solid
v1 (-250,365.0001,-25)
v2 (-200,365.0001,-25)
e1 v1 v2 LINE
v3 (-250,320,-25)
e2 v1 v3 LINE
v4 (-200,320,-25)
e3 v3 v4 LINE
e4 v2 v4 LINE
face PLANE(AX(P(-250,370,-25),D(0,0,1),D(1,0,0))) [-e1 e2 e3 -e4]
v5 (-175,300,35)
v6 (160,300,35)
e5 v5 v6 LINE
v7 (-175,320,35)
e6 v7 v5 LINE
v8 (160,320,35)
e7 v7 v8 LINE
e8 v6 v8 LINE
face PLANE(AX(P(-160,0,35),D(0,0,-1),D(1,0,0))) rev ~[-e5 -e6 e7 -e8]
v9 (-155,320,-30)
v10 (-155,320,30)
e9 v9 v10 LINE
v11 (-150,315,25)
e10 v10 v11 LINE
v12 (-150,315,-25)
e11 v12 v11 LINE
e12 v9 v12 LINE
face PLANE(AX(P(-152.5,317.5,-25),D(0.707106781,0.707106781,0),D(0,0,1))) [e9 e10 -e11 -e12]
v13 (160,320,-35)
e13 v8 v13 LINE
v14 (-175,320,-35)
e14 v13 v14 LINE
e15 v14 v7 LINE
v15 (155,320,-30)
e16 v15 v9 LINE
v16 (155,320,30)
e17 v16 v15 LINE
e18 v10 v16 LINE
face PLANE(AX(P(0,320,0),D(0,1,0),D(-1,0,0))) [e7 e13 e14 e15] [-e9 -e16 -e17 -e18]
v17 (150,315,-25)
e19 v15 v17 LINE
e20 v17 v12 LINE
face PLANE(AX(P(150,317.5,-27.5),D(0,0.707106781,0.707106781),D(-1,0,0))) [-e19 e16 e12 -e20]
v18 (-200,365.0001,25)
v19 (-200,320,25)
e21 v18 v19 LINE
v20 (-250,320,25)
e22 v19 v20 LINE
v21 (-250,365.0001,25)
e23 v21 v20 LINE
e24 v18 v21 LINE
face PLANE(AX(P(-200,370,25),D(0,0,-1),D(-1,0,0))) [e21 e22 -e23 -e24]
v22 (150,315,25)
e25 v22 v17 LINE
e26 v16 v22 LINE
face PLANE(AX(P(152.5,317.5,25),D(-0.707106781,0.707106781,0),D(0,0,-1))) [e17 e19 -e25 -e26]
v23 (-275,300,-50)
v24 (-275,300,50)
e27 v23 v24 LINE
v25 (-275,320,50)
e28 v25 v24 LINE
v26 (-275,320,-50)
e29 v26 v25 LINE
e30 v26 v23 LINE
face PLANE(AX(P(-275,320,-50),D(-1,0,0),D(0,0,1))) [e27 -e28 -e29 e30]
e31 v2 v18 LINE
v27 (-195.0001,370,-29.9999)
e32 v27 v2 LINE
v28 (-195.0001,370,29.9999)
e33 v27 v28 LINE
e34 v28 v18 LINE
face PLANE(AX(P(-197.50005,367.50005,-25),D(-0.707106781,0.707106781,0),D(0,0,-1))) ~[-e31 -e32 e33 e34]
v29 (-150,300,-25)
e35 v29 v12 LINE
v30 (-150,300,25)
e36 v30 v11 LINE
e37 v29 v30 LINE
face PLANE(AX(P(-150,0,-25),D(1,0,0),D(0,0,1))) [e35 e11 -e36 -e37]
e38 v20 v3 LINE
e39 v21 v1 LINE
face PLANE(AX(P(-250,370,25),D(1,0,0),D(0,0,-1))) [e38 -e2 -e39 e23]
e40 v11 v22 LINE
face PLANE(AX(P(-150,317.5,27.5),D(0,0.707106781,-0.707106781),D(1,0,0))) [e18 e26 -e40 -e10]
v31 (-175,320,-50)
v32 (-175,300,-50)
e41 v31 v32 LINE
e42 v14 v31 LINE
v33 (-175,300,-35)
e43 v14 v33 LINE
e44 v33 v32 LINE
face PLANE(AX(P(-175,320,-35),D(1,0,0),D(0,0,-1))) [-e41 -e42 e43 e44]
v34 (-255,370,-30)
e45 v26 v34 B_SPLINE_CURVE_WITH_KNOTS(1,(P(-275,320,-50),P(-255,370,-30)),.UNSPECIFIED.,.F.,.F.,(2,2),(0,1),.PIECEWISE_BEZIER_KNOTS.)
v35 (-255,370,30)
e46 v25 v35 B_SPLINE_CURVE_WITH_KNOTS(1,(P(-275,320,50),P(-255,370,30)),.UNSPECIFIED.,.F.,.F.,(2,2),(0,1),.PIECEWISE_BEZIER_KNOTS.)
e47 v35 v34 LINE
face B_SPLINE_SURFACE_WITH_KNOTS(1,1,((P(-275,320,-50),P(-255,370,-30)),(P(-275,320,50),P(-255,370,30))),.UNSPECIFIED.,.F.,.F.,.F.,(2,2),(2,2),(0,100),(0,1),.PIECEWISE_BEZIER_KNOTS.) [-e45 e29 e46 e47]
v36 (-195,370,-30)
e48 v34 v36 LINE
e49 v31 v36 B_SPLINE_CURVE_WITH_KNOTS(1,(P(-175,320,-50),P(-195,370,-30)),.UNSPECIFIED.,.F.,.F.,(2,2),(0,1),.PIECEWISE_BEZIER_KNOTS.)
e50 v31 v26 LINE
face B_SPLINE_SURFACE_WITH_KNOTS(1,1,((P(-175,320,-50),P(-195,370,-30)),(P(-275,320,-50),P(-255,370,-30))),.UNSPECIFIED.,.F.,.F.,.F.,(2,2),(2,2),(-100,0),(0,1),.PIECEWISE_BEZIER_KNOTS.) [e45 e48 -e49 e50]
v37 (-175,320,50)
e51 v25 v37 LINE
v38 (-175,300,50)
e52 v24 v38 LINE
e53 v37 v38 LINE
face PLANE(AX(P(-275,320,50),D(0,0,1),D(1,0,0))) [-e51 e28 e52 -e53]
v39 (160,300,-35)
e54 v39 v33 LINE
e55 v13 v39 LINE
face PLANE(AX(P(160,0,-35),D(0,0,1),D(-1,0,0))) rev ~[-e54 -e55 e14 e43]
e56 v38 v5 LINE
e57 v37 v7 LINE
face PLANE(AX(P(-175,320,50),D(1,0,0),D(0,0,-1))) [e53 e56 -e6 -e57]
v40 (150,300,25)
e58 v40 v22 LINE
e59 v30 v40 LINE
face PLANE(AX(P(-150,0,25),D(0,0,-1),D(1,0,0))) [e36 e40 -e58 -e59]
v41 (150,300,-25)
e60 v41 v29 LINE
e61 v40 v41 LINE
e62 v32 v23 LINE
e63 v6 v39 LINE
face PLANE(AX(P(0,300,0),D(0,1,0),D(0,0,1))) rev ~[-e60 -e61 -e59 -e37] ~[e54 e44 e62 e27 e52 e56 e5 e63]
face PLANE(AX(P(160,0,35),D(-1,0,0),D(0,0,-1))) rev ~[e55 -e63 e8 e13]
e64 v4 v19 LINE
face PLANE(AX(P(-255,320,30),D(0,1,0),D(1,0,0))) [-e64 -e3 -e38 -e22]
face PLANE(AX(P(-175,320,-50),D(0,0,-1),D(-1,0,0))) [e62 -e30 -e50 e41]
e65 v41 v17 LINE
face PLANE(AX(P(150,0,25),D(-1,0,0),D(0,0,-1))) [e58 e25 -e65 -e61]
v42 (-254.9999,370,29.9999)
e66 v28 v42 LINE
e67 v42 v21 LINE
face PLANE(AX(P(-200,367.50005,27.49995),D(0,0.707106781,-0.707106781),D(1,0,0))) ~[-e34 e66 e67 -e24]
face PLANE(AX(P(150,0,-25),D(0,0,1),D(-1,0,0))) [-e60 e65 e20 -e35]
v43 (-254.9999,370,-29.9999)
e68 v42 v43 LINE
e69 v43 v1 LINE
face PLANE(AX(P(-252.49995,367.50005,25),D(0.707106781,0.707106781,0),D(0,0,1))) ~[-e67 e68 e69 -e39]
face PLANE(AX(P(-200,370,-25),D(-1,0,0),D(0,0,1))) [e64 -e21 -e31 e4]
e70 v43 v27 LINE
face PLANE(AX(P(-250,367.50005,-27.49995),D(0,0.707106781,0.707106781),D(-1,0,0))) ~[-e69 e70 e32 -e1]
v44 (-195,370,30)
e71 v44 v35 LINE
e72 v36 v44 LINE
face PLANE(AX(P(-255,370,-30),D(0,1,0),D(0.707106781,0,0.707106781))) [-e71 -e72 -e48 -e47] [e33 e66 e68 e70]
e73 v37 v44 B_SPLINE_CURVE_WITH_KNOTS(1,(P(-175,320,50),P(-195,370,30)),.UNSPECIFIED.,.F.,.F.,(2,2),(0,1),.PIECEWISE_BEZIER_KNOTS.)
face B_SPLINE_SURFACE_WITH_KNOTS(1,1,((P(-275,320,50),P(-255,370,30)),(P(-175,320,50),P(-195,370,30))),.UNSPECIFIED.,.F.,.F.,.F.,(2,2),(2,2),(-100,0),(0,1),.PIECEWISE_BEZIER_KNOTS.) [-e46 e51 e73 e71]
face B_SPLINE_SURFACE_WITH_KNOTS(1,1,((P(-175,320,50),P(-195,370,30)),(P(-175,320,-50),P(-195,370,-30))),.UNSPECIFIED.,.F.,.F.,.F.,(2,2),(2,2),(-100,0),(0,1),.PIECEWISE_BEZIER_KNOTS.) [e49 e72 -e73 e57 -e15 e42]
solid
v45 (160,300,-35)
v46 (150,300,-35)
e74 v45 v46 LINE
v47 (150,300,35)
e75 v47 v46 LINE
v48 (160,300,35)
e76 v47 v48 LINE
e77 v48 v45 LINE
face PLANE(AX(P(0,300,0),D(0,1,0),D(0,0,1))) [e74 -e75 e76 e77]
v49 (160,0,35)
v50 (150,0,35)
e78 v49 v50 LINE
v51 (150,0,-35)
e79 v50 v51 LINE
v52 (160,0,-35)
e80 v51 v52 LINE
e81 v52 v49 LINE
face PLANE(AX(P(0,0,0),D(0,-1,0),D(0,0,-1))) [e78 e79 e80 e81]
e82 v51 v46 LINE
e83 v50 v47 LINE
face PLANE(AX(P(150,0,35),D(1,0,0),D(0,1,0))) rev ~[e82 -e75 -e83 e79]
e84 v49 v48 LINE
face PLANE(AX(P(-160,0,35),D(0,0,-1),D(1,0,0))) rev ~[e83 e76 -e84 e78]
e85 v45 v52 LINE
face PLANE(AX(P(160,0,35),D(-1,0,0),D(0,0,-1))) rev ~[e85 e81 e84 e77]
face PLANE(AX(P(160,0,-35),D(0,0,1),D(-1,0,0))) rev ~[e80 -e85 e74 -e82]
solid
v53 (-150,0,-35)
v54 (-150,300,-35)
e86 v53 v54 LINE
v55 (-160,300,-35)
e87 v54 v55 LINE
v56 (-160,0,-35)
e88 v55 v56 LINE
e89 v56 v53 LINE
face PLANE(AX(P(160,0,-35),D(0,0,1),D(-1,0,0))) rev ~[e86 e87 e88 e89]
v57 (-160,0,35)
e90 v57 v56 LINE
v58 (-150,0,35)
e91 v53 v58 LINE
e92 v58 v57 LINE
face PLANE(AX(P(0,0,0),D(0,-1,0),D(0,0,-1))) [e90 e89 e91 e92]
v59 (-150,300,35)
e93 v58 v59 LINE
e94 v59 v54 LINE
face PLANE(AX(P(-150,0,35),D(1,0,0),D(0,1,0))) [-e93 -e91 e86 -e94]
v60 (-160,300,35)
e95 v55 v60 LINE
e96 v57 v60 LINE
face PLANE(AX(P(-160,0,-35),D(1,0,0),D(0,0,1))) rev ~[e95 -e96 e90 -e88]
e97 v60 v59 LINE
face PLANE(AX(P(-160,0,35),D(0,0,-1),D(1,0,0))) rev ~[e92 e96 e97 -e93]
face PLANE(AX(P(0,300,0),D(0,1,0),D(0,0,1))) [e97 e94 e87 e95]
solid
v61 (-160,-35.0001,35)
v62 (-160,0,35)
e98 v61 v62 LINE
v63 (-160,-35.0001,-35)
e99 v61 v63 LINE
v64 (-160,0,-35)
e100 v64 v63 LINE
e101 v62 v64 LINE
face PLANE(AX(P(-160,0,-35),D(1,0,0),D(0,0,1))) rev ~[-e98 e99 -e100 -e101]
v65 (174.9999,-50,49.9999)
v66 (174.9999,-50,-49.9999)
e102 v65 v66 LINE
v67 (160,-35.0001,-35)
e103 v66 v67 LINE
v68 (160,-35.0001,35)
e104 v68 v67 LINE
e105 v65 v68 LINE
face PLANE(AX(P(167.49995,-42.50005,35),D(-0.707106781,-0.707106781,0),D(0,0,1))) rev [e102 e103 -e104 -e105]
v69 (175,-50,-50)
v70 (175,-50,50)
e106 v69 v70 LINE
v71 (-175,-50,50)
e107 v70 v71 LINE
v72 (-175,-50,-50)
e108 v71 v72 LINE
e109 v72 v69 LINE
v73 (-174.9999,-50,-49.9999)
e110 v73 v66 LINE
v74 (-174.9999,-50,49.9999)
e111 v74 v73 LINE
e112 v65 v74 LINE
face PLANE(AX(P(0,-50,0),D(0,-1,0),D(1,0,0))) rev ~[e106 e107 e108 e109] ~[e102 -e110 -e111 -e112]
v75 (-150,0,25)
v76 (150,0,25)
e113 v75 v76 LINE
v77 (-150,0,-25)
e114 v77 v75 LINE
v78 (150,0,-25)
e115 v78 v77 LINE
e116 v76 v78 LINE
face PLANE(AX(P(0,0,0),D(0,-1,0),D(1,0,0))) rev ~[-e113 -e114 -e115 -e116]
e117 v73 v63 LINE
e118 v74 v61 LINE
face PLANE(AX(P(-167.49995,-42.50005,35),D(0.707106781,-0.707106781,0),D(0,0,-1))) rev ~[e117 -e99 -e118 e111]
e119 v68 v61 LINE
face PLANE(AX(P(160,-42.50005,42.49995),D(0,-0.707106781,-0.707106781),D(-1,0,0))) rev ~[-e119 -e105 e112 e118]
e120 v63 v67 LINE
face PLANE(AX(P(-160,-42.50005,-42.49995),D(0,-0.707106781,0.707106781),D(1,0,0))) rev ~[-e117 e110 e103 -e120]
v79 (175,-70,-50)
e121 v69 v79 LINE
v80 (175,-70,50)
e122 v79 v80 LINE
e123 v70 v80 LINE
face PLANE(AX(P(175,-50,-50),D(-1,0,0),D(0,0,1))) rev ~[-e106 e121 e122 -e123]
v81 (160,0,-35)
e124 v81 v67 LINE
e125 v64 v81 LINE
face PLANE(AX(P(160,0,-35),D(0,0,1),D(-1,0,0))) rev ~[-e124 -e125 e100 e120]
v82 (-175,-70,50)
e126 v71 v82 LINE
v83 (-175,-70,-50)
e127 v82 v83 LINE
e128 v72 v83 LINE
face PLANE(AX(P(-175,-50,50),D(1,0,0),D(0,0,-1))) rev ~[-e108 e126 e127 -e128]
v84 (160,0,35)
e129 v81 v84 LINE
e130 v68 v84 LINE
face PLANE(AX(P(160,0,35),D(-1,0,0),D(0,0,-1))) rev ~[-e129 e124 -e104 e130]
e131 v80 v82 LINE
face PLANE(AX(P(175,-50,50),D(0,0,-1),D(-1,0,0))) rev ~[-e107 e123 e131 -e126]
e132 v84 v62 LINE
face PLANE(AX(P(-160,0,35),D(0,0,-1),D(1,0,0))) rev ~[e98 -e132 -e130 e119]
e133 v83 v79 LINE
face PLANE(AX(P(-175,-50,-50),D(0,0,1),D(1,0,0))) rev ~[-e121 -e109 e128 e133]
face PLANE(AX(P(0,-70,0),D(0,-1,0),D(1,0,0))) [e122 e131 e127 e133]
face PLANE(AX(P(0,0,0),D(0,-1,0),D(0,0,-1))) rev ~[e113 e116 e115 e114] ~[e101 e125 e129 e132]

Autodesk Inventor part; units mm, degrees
sketch "Sketch1" plane through (0, 0, 0) normal (0, 1, 0) x (-1, 0, 0)
  line L0 (150, 25) -> (-150, 25)
  line L1 (-150, 25) -> (-150, -25)
  line L2 (-150, -25) -> (150, -25)
  line L3 (150, -25) -> (150, 25)
  line L4 (150, 25) -> (-150, -25) construction
  line L5 (-150, 25) -> (150, -25) construction
  line L6 (160, 35) -> (-160, 35)
  line L7 (-160, 35) -> (-160, -35)
  line L8 (-160, -35) -> (160, -35)
  line L9 (160, -35) -> (160, 35)
  line L10 (160, 35) -> (-160, -35) construction
  line L11 (-160, 35) -> (160, -35) construction
  point P0 (0, 0)
  dimension "d0" = 300
  dimension "d1" = 50
  dimension "d2" = 320
  dimension "d3" = 70
extrude "Extrusion1" add sketch "Sketch1" along normal blind 320
ref_plane "Work Plane1" through (0, 300, 0) normal (0, 1, 0) x (1, 0, 0)
sketch "Sketch2" plane through (0, 0, 0) normal (0, -1, 0) x (1, 0, 0)
  line L0 (160, 35) -> (160, -35) projected
  line L1 (-160, -35) -> (160, -35)
  line L2 (160, -35) -> (160, 35)
  line L3 (160, 35) -> (-160, 35)
  line L4 (-160, 35) -> (-160, -35)
  line L5 (-160, -35) -> (160, 35) construction
  line L6 (160, -35) -> (-160, 35) construction
  point P0 (0, 0)
extrude "Extrusion2" add sketch "Sketch2" along normal blind 50
sketch "Sketch3" plane through (0, -50, 0) normal (0, -1, 0) x (1, 0, 0)
  line L0 (-175, -50) -> (175, -50)
  line L1 (175, -50) -> (175, 50)
  line L2 (175, 50) -> (-175, 50)
  line L3 (-175, 50) -> (-175, -50)
  line L4 (-175, -50) -> (175, 50) construction
  line L5 (175, -50) -> (-175, 50) construction
  point P0 (0, 0)
  dimension "d9" = 350
  dimension "d10" = 100
extrude "Extrusion3" add sketch "Sketch3" along normal blind 20
chamfer "Chamfer1" distance 15 angle 45 4 edges at (0, -50, 35) (-160, -50, 0) (0, -50, -35) (160, -50, 0)
chamfer "Chamfer2" distance 5 angle 45 4 edges at (0, 320, -25) (-150, 320, 0) (0, 320, 25) (150, 320, 0)
split body "Split1" result two bodies by plane through (0, 300, 0) normal (0, 1, 0) first body at (50, 300.5, 31.6667)
ref_plane "Work Plane2" through (0, 0, 0) normal (0, -1, 0) x (1, 0, 0)
split body "Split2" result two bodies by plane through (0, 0, 0) normal (0, -1, 0) bodies 3 first body at (58.3333, -69.5, -16.6667)
sketch "Sketch4" plane through (-160, 300, 35) normal (0, 0, 1) x (1, 0, 0)
  line L0 (10, -300) -> (10, 0) projected
  line L1 (310, -300) -> (310, 0) projected
  line L2 (10, 0) -> (310, 0)
  line L3 (310, 0) -> (310, -300)
  line L4 (310, -300) -> (10, -300)
  line L5 (10, -300) -> (10, 0)
  point P0 (160, -300)
extrude "Extrusion4" cut sketch "Sketch4" against normal through all bodies 5
sketch "Sketch5" plane through (0, 320, 0) normal (0, 1, 0) x (1, 0, 0)
  line L0 (-175, -50) -> (-175, 50) projected
  line L1 (-175, 50) -> (-275, 50)
  line L2 (-275, 50) -> (-275, -50)
  line L3 (-275, -50) -> (-175, -50)
  line L4 (-175, -50) -> (-175, 50)
  line L5 (-160, 35) -> (160, 35) projected
  line L6 (-160, 35) -> (-175, 35)
  line L7 (-175, 35) -> (-175, -35)
  line L8 (-175, -35) -> (-160, -35)
  line L9 (-160, -35) -> (-160, 35)
  point P0 (0, 0)
  dimension "d22" = 100
  dimension "d23" = 100
  dimension "d24" = 15
  dimension "d25" = 70
extrude "Extrusion5" add sketch "Sketch5" against normal blind 20 bodies 2
ref_plane "Work Plane3" through (0, 370, 0) normal (0, 1, 0) x (1, 0, 0)
sketch "Sketch7" plane through (0, 370, 0) normal (0, 1, 0) x (1, 0, 0)
  line L0 (-255, 30) -> (-195, 30)
  line L1 (-195, 30) -> (-195, -30)
  line L2 (-195, -30) -> (-255, -30)
  line L3 (-255, -30) -> (-255, 30)
  line L4 (-175, 50) -> (-275, 50) projected
  line L5 (-275, 50) -> (-275, -50) projected
  point P0 (0, 0)
  dimension "d33" = 60
  dimension "d34" = 60
  dimension "d35" = 20
  dimension "d36" = 20
sketch "Sketch8" plane through (0, 320, 0) normal (0, 1, 0) x (1, 0, 0)
  line L0 (-275, 50) -> (-275, -50) projected
  line L1 (-175, -50) -> (-275, -50) projected
  line L2 (-275, 50) -> (-175, 50)
  line L3 (-175, 50) -> (-175, -50)
  line L4 (-175, -50) -> (-275, -50)
  line L5 (-275, -50) -> (-275, 50)
  point P0 (0, 0)
loft "Loft1" add profiles "Sketch8", "Sketch7" bodies 2
sketch "Sketch9" plane through (-255, 370, 30) normal (0, 1, 0) x (1, 0, 0)
  line L0 (5, 55) -> (55, 55)
  line L1 (55, 55) -> (55, 5)
  line L2 (55, 5) -> (5, 5)
  line L3 (5, 5) -> (5, 55)
  line L4 (60, 60) -> (0, 60) projected
  line L5 (0, 60) -> (0, 0) projected
  point P0 (255, 30)
  dimension "d41" = 50
  dimension "d42" = 50
  dimension "d43" = 5
  dimension "d44" = 5
extrude "Extrusion6" cut sketch "Sketch9" against normal blind 50 bodies 2
chamfer "Chamfer3" distance 5 angle 45 4 edges at (-225, 370, -25) (-200, 370, 0) (-225, 370, 25) (-250, 370, 0)
equation "\"d4\" = d2"
properties part number "Box"
